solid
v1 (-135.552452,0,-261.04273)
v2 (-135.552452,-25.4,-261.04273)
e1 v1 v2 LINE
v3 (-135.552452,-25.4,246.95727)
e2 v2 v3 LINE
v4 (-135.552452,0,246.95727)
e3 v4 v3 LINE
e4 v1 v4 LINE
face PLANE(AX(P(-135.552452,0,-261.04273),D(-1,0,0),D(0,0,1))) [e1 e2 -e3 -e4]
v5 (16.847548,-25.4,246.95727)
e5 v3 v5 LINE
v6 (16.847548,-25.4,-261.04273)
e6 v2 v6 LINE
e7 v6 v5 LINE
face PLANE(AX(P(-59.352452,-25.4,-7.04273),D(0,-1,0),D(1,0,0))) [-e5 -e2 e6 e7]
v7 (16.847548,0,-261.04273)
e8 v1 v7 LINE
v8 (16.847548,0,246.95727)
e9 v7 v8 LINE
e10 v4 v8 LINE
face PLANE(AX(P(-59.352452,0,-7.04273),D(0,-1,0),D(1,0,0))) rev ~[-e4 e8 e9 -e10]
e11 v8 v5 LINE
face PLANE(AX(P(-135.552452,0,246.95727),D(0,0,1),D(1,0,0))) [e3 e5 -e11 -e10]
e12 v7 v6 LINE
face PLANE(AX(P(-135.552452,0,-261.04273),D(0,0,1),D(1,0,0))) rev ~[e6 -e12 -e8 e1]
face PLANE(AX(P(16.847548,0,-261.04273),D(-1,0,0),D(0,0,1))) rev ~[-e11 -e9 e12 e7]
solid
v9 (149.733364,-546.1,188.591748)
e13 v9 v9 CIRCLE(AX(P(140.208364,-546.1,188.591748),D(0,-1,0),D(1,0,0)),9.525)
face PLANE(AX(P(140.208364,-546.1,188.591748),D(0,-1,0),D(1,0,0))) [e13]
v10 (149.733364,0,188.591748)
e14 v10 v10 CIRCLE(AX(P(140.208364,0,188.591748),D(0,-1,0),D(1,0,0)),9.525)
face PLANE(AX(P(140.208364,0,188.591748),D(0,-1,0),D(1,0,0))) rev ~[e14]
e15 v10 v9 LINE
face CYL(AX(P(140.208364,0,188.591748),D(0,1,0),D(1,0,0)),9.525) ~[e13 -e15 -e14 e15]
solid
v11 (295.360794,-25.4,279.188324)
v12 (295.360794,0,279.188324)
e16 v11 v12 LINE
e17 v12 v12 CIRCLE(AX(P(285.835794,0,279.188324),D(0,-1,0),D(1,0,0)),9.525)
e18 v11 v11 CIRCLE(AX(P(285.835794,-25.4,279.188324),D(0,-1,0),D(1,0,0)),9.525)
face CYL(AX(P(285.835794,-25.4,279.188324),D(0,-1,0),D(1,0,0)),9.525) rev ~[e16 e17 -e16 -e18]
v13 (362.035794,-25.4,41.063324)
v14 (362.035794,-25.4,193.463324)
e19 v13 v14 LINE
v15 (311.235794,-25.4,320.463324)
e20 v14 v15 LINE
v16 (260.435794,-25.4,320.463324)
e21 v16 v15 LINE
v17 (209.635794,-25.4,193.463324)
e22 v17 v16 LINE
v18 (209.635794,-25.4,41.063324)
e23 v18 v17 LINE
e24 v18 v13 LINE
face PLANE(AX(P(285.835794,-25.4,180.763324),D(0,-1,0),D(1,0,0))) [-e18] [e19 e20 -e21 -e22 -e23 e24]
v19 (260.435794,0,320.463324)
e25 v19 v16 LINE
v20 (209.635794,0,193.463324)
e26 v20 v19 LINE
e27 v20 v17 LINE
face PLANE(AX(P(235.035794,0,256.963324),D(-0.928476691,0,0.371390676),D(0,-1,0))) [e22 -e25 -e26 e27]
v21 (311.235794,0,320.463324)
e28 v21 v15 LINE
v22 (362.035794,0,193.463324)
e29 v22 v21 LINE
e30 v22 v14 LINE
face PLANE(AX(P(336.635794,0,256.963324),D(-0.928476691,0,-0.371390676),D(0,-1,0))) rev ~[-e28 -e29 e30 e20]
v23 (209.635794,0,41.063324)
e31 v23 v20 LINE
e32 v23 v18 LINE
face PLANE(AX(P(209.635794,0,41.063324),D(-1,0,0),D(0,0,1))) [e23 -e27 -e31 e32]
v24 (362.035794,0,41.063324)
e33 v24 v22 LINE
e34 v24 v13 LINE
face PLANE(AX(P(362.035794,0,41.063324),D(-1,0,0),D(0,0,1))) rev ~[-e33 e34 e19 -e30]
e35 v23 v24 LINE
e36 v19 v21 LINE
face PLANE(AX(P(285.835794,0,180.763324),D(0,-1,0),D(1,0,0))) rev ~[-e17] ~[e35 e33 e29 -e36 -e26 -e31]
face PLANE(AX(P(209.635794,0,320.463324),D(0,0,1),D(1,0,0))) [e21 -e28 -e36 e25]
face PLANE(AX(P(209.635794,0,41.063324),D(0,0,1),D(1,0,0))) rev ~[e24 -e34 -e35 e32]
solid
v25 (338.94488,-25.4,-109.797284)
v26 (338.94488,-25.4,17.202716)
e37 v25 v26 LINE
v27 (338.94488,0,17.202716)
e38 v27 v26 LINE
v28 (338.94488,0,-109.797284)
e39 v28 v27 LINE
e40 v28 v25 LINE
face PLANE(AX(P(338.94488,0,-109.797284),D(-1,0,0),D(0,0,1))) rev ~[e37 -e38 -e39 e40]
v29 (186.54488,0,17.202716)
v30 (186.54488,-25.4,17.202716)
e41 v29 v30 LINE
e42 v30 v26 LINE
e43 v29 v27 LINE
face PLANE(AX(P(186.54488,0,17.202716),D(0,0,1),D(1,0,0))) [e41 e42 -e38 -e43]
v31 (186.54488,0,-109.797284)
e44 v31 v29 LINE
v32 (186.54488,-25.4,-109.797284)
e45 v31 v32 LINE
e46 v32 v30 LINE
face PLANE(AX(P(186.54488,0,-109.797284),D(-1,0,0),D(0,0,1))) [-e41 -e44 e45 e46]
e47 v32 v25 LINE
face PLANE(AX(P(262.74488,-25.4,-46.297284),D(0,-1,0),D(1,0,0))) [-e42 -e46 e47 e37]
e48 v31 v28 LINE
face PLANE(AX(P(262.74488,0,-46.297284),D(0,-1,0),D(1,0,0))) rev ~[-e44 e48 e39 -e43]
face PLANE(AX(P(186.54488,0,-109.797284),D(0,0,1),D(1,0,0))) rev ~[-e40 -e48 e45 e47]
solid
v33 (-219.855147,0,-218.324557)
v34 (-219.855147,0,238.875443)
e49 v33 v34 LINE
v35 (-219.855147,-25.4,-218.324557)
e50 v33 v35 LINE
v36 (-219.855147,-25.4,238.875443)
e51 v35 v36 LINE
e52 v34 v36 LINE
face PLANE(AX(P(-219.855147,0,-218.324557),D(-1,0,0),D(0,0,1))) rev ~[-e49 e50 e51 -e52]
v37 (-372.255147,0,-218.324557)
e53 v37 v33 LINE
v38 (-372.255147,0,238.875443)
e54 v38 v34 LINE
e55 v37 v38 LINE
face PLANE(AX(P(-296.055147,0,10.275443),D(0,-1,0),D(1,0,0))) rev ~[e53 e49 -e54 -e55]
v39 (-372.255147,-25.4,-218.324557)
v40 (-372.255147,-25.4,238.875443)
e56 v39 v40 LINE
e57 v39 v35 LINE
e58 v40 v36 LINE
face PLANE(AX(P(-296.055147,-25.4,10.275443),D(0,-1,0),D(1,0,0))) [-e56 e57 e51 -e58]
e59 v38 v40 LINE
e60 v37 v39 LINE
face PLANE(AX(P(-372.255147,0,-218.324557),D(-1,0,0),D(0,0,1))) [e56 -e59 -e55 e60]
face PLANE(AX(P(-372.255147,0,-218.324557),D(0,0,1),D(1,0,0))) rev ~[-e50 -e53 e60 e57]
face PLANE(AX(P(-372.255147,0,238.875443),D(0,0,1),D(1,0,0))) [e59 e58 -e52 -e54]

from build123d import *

# Parameters (mm, degrees)
F0_W       = 152.4
F0_H       = 457.2
F1_DEPTH   = 25.4
F0_H_2     = 508
F0_H_3     = 127
F0_H_4     = 279.4
F2_SIZE2   = 50.8
F2_SIZE    = 127
F2_2_SIZE2 = 50.8
F2_2_SIZE  = 127
F3_R       = 9.525
F4_DEPTH   = 25.4
F0_R       = 9.525
F5_DEPTH   = 546.1


# Not quite as in the source:
# - a feature names something its author has since deleted; it is built from what else it names


with BuildPart() as f1:
    # F0 (on Front) → F1 (new body)
    with BuildSketch(Plane.XZ):
        with Locations((-296.0551465034, 10.2754430532)):
            Rectangle(F0_W, F0_H)
    extrude(amount=F1_DEPTH)


with BuildPart() as f1b:
    # F0 (on Front) → F1, piece 2 (new body)
    with BuildSketch(Plane.XZ):
        with Locations((-59.3524523611, -7.0427302271)):
            Rectangle(F0_W, F0_H_2)
    extrude(amount=F1_DEPTH)


with BuildPart() as f1c:
    # F0 (on Front) → F1, piece 3 (new body)
    with BuildSketch(Plane.XZ):
        with Locations((262.744880271, -46.2972840071)):
            Rectangle(F0_W, F0_H_3)
    extrude(amount=F1_DEPTH)


with BuildPart() as f1d:
    # F0 (on Front) → F1, piece 4 (new body)
    with BuildSketch(Plane.XZ):
        with Locations((285.8357941628, 180.763323617)):
            Rectangle(F0_W, F0_H_4)
    extrude(amount=F1_DEPTH)

    # F2
    f2_edges = [f1d.edges().sort_by_distance(p)[0] for p in [
        (362.035794, -12.7, 320.463324),
    ]]
    f2_side = f1d.faces().sort_by_distance((362.035794, -12.7, 180.763324))[0]
    chamfer(f2_edges, length=F2_SIZE, length2=F2_SIZE2, reference=f2_side)

    # F2#2
    f2_2_edges = [f1d.edges().sort_by_distance(p)[0] for p in [
        (209.635794, -12.7, 320.463324),
    ]]
    f2_2_side = f1d.faces().sort_by_distance((209.635794, -12.7, 180.763324))[0]
    chamfer(f2_2_edges, length=F2_2_SIZE, length2=F2_2_SIZE2, reference=f2_2_side)

    # F3 (on face) → F4 (cut)
    with BuildSketch(Plane.XZ.offset(25.4)):
        with Locations((285.8357941628, 279.188323617)):
            Circle(F3_R)
    extrude(amount=-F4_DEPTH, mode=Mode.SUBTRACT)


with BuildPart() as f5:
    # F0 (on Front) → F5 (new body)
    with BuildSketch(Plane.XZ):
        with Locations((140.208363533, 188.591748476)):
            Circle(F0_R)
    extrude(amount=F5_DEPTH)


solid = Compound([f1.part, f1b.part, f1c.part, f1d.part, f5.part])
